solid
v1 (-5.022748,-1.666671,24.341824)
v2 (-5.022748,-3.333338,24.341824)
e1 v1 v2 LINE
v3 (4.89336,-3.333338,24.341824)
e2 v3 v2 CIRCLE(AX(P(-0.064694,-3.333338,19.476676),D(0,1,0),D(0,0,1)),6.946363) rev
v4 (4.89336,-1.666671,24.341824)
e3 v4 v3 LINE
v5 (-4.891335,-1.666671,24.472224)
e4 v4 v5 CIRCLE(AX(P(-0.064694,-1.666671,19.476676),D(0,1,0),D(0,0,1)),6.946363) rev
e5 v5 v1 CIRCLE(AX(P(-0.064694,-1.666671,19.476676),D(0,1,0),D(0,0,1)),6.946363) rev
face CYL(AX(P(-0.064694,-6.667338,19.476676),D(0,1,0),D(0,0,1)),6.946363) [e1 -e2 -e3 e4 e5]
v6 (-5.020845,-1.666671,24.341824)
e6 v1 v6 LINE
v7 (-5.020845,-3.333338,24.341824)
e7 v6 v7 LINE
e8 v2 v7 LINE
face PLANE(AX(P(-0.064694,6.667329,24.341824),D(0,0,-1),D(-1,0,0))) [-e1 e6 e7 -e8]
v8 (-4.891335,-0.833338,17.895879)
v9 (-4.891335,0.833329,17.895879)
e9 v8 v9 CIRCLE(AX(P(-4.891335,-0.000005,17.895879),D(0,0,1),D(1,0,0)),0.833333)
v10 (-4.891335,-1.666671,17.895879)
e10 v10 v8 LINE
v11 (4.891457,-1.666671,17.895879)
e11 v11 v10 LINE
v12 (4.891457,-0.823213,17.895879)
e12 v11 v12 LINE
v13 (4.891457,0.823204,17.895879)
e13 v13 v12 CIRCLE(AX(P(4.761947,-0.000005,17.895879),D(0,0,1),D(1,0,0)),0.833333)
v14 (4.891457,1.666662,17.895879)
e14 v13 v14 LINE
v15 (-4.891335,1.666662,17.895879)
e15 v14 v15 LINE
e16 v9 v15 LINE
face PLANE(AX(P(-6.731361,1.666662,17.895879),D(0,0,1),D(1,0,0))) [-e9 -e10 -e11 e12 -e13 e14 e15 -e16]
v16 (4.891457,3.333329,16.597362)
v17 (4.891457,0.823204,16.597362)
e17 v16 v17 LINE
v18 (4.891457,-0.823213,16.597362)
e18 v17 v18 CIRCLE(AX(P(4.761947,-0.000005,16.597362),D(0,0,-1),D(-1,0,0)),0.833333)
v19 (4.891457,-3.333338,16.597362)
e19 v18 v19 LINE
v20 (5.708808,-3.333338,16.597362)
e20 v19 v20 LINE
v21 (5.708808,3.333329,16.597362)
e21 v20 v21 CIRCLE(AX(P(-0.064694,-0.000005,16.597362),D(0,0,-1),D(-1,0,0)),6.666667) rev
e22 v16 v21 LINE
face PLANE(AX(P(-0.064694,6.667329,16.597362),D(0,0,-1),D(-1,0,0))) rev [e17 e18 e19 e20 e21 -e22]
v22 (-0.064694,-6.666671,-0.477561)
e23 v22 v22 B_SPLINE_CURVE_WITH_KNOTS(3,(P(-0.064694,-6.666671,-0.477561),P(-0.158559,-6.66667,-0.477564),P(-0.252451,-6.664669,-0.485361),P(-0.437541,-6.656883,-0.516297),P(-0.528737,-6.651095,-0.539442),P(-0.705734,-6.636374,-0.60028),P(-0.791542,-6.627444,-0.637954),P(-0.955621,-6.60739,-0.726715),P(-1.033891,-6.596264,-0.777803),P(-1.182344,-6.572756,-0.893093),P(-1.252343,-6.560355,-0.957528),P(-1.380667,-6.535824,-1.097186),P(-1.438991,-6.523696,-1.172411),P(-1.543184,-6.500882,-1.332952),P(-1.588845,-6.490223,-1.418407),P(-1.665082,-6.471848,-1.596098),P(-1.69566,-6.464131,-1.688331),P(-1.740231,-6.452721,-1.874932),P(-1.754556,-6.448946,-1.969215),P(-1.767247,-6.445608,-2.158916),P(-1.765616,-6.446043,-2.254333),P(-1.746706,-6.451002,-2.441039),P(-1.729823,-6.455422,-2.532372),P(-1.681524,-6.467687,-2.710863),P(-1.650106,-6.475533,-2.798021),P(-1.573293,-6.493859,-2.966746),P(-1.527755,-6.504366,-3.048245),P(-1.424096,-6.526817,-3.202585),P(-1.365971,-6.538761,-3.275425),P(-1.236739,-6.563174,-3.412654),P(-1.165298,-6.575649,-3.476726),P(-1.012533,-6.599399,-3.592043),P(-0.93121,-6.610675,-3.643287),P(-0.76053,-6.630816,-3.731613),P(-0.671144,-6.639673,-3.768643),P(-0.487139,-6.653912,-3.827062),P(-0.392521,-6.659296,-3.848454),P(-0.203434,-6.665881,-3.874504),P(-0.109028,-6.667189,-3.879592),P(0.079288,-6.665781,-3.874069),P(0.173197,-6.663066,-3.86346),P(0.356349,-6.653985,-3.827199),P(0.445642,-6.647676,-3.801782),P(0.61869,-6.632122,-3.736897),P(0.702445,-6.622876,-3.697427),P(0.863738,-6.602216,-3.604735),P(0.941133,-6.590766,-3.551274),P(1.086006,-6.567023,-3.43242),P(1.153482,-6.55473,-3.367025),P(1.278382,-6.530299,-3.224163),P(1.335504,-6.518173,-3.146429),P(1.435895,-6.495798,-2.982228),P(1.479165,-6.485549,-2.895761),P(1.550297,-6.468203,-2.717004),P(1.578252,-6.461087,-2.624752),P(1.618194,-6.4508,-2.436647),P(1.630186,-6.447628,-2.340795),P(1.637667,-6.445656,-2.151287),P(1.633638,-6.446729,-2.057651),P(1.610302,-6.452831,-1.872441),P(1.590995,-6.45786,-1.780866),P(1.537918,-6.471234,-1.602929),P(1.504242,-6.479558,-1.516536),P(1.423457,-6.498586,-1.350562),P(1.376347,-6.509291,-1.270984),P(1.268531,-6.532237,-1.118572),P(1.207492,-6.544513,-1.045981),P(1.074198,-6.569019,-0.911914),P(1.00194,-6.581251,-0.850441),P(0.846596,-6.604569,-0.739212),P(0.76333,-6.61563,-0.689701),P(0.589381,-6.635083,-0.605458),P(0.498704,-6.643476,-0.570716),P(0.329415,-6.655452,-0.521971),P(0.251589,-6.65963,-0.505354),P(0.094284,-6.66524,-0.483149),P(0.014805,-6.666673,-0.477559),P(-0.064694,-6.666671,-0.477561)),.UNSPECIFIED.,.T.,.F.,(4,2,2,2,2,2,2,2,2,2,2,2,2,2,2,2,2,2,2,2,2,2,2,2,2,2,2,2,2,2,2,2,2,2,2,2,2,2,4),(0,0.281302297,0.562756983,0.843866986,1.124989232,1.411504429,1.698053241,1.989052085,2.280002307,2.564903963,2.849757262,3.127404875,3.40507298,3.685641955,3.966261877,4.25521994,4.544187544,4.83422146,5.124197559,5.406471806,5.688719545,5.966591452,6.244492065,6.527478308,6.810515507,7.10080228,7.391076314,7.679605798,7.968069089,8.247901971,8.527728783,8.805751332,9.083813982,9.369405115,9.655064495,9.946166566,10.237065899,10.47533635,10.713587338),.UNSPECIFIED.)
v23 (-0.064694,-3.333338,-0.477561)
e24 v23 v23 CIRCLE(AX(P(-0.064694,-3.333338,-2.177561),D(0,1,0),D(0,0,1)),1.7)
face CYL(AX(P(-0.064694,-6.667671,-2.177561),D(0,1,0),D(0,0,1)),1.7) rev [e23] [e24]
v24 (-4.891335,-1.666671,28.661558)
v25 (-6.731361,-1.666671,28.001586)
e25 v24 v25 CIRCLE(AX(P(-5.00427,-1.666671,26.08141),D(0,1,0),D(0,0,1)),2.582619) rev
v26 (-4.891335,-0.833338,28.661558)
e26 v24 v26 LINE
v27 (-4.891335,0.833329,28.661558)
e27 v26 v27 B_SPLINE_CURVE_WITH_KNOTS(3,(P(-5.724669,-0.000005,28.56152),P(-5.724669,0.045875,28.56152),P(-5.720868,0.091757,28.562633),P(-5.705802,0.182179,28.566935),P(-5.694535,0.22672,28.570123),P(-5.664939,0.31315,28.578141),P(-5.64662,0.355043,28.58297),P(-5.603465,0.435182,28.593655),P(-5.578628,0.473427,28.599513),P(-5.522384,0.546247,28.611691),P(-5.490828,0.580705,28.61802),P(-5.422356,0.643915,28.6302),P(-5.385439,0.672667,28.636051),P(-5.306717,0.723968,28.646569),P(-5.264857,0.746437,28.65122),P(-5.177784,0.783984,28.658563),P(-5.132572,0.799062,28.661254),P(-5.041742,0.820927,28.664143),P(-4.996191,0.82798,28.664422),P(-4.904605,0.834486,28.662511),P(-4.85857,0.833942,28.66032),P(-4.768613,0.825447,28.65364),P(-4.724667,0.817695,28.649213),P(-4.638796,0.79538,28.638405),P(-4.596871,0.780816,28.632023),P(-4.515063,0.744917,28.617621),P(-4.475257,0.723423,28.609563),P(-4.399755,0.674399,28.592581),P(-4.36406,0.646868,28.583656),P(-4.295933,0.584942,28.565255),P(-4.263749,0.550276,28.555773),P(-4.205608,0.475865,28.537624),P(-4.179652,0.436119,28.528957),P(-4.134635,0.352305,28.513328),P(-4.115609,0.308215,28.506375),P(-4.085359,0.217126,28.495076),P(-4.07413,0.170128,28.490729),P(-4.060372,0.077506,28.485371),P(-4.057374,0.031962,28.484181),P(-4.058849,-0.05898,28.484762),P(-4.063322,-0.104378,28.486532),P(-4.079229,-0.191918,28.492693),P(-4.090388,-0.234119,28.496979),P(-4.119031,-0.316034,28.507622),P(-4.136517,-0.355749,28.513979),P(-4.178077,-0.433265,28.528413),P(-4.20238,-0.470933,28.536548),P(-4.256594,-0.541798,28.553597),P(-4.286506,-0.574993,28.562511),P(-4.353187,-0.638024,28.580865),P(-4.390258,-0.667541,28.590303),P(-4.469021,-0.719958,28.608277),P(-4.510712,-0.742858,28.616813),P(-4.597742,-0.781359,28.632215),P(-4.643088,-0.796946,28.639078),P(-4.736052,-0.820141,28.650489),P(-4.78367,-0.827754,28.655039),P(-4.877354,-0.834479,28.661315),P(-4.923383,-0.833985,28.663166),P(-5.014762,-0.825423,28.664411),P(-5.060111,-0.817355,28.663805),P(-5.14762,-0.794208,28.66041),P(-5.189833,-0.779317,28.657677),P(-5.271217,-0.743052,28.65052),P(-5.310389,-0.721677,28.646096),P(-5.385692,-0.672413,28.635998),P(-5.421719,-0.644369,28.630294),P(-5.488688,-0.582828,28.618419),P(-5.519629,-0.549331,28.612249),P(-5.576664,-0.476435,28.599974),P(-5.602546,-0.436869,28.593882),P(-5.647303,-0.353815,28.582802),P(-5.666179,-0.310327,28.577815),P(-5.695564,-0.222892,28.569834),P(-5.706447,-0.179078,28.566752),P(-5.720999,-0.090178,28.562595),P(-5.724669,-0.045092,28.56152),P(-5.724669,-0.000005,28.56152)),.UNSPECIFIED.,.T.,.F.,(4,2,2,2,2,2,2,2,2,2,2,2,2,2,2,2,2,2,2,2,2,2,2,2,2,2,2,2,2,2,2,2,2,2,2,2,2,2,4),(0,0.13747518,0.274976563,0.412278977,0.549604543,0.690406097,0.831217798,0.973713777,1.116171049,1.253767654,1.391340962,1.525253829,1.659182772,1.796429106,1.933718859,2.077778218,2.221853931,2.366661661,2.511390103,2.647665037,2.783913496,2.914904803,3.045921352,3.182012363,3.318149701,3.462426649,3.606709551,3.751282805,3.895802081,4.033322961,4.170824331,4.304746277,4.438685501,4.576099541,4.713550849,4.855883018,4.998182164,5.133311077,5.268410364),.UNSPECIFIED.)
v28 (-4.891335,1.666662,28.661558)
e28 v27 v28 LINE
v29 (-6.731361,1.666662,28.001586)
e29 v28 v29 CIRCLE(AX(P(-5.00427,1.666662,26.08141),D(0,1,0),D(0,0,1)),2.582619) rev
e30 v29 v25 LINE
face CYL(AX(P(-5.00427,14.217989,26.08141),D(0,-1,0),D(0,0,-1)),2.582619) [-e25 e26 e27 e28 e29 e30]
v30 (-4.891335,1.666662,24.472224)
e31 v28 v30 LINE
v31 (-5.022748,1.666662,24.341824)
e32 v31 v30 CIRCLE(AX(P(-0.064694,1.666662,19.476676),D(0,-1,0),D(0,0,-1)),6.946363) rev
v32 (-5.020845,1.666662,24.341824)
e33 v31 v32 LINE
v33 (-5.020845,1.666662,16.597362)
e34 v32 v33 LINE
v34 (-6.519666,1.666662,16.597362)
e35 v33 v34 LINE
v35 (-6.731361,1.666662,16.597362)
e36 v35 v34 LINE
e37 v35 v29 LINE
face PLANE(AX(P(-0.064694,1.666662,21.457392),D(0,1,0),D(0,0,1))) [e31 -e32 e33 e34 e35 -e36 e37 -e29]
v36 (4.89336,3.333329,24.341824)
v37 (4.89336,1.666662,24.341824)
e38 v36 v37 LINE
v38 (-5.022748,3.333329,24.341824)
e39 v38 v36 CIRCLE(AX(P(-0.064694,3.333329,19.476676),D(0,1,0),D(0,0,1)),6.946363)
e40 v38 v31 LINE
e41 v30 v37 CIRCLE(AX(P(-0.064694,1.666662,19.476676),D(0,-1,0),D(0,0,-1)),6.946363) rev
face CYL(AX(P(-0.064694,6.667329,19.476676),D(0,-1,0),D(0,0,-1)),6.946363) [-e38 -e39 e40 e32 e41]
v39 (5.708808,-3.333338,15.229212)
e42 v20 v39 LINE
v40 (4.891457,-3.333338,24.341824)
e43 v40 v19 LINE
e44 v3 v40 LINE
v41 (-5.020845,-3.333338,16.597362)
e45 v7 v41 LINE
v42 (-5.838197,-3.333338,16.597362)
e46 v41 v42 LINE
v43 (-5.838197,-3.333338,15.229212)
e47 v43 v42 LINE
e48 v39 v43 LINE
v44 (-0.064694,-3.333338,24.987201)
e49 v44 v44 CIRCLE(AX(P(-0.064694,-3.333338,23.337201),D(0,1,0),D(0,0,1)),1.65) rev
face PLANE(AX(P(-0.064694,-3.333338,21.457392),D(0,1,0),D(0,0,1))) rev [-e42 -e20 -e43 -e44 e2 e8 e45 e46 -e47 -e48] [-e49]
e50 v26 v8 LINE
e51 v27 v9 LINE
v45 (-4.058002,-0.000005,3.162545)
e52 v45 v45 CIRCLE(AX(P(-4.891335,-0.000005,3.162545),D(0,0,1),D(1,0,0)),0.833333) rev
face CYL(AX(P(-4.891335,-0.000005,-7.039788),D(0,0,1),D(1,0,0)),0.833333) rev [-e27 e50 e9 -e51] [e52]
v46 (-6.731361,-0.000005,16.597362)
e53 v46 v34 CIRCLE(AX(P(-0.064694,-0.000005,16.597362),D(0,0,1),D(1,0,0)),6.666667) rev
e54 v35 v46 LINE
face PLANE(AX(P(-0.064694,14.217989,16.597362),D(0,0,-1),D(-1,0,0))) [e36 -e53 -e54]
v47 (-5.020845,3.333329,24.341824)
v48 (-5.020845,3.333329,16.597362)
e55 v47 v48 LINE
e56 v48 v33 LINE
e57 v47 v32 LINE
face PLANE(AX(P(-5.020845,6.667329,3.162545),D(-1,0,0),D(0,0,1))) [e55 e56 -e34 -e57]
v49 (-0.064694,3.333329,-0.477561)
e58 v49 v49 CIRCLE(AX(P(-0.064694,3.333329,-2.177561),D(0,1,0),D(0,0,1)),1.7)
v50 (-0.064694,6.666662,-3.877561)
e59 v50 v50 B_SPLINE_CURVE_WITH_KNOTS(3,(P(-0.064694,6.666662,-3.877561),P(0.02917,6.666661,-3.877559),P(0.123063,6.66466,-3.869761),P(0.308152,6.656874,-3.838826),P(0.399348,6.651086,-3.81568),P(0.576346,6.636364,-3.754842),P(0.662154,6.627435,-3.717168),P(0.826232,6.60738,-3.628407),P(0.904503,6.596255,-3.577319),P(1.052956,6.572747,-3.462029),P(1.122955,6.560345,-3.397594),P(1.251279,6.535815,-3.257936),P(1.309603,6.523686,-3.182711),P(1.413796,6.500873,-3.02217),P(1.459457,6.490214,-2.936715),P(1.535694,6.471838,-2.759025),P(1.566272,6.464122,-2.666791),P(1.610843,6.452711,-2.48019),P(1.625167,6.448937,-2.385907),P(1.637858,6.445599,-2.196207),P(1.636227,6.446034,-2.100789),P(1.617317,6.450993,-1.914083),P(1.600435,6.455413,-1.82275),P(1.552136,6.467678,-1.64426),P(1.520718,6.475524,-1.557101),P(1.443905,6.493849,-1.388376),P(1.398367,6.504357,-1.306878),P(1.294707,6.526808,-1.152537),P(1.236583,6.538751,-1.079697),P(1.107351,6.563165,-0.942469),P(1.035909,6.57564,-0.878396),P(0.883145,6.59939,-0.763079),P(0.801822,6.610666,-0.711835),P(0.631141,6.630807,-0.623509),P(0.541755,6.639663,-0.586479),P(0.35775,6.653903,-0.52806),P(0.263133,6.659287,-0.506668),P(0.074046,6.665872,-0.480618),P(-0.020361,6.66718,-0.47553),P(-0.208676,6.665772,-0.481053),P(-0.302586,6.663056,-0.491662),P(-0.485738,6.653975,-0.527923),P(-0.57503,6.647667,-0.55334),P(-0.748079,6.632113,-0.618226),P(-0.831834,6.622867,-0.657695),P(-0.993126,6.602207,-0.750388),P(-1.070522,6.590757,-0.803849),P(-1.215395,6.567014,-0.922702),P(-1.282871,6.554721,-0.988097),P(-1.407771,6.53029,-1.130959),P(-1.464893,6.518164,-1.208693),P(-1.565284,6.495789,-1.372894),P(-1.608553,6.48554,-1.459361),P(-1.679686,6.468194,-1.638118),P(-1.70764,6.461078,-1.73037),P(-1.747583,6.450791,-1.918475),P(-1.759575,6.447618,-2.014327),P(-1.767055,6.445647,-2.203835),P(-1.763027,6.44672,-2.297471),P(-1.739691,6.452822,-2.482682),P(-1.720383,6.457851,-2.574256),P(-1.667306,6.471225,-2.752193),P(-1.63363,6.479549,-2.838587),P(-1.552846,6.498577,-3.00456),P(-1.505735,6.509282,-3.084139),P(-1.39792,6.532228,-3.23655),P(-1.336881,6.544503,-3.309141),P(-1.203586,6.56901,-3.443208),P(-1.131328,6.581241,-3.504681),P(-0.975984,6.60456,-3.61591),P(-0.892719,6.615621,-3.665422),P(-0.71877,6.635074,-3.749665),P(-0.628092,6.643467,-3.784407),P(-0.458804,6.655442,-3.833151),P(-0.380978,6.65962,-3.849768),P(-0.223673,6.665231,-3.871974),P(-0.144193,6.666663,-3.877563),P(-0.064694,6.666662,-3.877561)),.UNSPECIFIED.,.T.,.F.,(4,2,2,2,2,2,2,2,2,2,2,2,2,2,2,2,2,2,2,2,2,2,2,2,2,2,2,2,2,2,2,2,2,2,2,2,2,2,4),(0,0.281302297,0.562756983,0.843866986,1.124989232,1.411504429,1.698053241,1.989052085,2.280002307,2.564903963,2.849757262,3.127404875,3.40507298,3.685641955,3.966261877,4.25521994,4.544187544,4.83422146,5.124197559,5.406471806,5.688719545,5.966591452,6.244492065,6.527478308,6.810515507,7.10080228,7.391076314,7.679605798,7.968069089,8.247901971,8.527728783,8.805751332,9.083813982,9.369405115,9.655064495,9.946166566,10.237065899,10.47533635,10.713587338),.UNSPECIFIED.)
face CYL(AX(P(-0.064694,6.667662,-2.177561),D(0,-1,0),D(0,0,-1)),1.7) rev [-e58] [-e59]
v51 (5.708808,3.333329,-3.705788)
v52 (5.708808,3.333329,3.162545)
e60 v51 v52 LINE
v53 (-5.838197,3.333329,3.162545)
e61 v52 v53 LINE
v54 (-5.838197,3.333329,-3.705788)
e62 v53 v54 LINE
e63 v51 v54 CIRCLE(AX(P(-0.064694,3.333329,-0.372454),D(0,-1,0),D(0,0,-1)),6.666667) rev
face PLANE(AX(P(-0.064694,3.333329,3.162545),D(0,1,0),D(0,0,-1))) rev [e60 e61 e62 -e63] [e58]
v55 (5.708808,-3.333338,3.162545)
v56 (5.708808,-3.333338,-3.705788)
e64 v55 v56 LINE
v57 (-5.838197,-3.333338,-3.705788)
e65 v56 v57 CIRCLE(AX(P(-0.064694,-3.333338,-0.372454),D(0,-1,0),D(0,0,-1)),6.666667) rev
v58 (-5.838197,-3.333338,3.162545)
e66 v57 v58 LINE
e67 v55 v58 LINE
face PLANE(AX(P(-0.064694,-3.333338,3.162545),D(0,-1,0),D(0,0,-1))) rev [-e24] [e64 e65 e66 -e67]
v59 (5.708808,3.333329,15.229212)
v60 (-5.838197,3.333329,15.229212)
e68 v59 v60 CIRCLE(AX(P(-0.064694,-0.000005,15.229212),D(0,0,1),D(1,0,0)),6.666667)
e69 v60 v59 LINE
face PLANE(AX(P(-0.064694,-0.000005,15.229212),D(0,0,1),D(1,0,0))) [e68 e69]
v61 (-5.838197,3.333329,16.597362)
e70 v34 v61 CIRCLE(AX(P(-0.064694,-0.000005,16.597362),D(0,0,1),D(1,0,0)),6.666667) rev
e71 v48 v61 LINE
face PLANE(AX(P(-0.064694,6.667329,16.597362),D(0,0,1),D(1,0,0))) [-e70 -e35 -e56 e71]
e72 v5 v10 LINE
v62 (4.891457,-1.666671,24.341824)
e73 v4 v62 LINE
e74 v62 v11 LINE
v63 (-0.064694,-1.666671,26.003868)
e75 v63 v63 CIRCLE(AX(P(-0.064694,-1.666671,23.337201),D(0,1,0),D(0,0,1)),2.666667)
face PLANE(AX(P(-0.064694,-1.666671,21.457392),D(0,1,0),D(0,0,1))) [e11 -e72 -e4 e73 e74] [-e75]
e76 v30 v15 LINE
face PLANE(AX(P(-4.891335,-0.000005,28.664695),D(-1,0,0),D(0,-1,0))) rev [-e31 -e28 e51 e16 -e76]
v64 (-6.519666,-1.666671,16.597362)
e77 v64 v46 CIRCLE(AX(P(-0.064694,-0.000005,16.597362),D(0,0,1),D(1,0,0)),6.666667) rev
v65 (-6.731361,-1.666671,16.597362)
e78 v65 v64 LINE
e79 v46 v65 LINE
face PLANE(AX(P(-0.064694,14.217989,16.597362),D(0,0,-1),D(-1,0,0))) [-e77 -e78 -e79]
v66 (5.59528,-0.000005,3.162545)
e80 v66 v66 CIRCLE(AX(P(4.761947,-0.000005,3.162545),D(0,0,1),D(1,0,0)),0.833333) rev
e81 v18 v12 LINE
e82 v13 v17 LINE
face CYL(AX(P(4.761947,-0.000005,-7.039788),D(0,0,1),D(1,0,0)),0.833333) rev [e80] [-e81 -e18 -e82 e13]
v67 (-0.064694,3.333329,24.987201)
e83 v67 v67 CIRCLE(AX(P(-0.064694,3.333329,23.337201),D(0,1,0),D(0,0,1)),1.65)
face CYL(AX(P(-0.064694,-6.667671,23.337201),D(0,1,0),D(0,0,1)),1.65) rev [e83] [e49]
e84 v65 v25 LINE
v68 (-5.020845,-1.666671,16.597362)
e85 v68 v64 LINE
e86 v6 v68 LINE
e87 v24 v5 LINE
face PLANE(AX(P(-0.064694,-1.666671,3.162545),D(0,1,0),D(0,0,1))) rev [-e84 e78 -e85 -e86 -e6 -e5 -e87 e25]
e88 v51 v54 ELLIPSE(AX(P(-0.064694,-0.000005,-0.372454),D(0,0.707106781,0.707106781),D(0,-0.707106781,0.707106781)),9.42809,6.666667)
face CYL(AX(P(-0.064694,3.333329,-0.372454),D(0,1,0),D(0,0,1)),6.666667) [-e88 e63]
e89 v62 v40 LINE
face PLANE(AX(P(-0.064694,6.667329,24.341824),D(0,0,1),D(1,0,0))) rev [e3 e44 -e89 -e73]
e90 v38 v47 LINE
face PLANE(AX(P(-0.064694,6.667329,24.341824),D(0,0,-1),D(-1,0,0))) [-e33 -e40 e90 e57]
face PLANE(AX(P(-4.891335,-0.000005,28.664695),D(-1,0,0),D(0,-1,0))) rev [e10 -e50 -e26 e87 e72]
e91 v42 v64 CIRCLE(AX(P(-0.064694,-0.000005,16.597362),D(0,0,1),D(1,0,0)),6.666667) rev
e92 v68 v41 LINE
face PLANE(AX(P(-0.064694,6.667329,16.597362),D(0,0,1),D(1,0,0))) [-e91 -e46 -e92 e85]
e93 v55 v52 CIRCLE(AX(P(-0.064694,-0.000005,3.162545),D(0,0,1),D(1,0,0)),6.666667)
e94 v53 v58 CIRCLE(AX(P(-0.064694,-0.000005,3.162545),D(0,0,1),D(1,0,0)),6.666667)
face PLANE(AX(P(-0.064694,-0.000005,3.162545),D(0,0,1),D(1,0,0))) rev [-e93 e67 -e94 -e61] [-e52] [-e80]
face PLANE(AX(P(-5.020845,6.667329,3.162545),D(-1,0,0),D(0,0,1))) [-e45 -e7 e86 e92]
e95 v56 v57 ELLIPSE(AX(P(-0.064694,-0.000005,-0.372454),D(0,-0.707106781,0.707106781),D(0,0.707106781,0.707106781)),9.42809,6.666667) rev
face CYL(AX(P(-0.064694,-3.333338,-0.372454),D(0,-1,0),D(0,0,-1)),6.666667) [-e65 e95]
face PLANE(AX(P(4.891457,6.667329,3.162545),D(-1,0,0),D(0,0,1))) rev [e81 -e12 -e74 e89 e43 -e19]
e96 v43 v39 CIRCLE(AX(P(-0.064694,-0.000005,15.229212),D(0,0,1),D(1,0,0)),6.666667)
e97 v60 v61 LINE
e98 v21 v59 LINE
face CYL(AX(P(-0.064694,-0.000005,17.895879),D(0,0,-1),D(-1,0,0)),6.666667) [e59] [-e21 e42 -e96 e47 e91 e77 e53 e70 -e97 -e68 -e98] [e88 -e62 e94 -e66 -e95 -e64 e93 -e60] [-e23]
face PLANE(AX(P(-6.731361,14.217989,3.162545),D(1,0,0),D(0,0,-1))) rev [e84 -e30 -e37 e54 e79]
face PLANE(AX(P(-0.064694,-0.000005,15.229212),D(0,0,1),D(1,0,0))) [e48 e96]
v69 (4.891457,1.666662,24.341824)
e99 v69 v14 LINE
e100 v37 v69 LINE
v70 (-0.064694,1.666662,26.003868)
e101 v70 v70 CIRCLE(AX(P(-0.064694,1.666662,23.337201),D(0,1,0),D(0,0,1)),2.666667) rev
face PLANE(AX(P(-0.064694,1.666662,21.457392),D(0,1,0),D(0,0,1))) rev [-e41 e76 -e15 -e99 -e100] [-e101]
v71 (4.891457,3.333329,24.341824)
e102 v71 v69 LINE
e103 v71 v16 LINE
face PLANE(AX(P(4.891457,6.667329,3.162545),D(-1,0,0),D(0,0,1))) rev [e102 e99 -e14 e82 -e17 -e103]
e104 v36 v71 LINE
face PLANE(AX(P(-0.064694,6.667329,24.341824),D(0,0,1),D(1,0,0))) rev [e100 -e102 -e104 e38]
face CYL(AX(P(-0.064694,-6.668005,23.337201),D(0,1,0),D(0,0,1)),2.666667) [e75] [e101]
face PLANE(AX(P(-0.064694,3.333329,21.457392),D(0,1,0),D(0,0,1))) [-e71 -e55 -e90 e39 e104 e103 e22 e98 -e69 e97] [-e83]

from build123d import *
from build123d.topology import SkipClean

# Parameters (mm, degrees)
SKETCH2_R                       = 10
PHALANGE_LENGTH_DEPTH           = 22.1
BOSS_EXTRUDE3_DEPTH             = 5
BOSS_EXTRUDE4_DEPTH             = 5
BOSS_EXTRUDE4_DEPTH_BACK        = 5
CUT_EXTRUDE2_START              = -15.3025
CUT_EXTRUDE2_DEPTH              = 15.3025
SKETCH7_R                       = 1.65
CUT_EXTRUDE3_DEPTH              = 10
CUT_EXTRUDE4_DEPTH              = 2.5
CUT_EXTRUDE4_DEPTH_BACK         = 2.5
CUT_EXTRUDE7_REACH              = 43.565
SKETCH4_R                       = 1.65
CUT_EXTRUDE7_DIRECTION_2_REACH  = 43.565
CUT_EXTRUDE_THIN1_START         = 22.1
CUT_EXTRUDE_THIN1_DEPTH         = 10.361670454
BOSS_EXTRUDE5_REACH             = 42.73
SKETCH9_R                       = 4
SKETCH9_R_2                     = 1.65
CUT_EXTRUDE8_REACH              = 41.987
SKETCH10_R                      = 1.25
CUT_EXTRUDE9_START              = -4
CUT_EXTRUDE9_DEPTH              = 4
CUT_EXTRUDE10_REACH             = 42.73
CUT_EXTRUDE10_DIRECTION_2_REACH = 42.73
CUT_EXTRUDE11_START             = -10
CUT_EXTRUDE11_OUTLINE_W         = 2.565773848
CUT_EXTRUDE11_OUTLINE_H         = 11.6166929
CUT_EXTRUDE11_DEPTH             = 10
BOSS_EXTRUDE7_REACH             = 40.388
CUT_EXTRUDE12_REACH             = 41.987
SKETCH10_2_R                    = 1.25
CUT_EXTRUDE12_DIRECTION_2_REACH = 41.987
SKETCH17_R                      = 1.25
SKETCH17_W                      = 2.42123439
SKETCH17_H                      = 5
CUT_EXTRUDE14_DEPTH             = 16.148519
SCALE1_SCALE                    = 0.666666667
CUT_EXTRUDE15_START             = -10
SKETCH18_R                      = 1.65
CUT_EXTRUDE15_DEPTH             = 13.333338
CUT_EXTRUDE16_START             = -3.333333
SKETCH19_R                      = 1.7
CUT_EXTRUDE16_DEPTH             = 13.333338


# Read off the part's stored shape, not the designer's step: Cut-Extrude-Thin1, Cut-Extrude11
with BuildPart() as part:
    # Sketch2 → Phalange Length (new body)
    with BuildSketch(Plane.XY):
        Circle(SKETCH2_R)
    extrude(amount=PHALANGE_LENGTH_DEPTH)

    # Sketch3 → Boss-Extrude3 (add)
    with BuildSketch(Plane(origin=(0, -10, 0), x_dir=(-1, 0, 0), z_dir=(0, -1, 0))):
        with BuildLine():
            Line((-10, 5.302499701), (-10, 0))
            Line((-10, 0), (10, 0))
            Line((10, 0), (10, 5.302499701))
            ThreePointArc((10, 5.302499701), (0, 15.302499701), (-10, 5.302499701))
        make_face()
    boss_extrude3 = extrude(amount=-BOSS_EXTRUDE3_DEPTH)

    # Mirror1: Boss-Extrude3 across plane
    add(boss_extrude3.mirror(Plane.ZX))

    # Sketch5 → Boss-Extrude4 (add, two sides: drawn at the far end of the back side and taken through both)
    with BuildSketch(Plane(origin=(0, 0, 0), x_dir=(1, 0, 0), z_dir=(0, 1, 0)).offset(-BOSS_EXTRUDE4_DEPTH_BACK)):
        with BuildLine():
            Line((-10, -27.883157911), (-10, -22.1))
            Line((-10, -22.1), (10, -22.1))
            Line((10, -22.1), (10, -27.883157911))
            ThreePointArc((10, -27.883157911), (0, -37.451984156), (-10, -27.883157911))
        make_face()
    extrude(amount=BOSS_EXTRUDE4_DEPTH + BOSS_EXTRUDE4_DEPTH_BACK)

    # Sketch6 → Cut-Extrude2 (cut)
    with SkipClean():  # the faces are left unmerged after this step: merging them gives an invalid solid
        with BuildSketch(Plane.XY.offset(CUT_EXTRUDE2_START)):
            with BuildLine():
                ThreePointArc((0, 10), (5, 8.660254038), (8.660254038, 5))
                Line((8.660254038, 5), (10, 5))
                Line((10, 5), (10, 10))
                Line((10, 10), (0, 10))
            make_face()
            with BuildLine():
                Line((10, -5), (8.660254038, -5))
                ThreePointArc((8.660254038, -5), (5, -8.660254038), (0, -10))
                Line((0, -10), (10, -10))
                Line((10, -10), (10, -5))
            make_face()
            with BuildLine():
                ThreePointArc((-8.660254038, 5), (-5, 8.660254038), (0, 10))
                Line((0, 10), (-10, 10))
                Line((-10, 10), (-10, 5))
                Line((-10, 5), (-8.660254038, 5))
            make_face()
            with BuildLine():
                Line((-10, -10), (0, -10))
                ThreePointArc((0, -10), (-5, -8.660254038), (-8.660254038, -5))
                Line((-8.660254038, -5), (-10, -5))
                Line((-10, -5), (-10, -10))
            make_face()
        extrude(amount=CUT_EXTRUDE2_DEPTH, mode=Mode.SUBTRACT)

    # Sketch7 → Cut-Extrude3 (cut)
    with SkipClean():  # the faces are left unmerged after this step: merging them gives an invalid solid
        with BuildSketch(Plane(origin=(0, 5, 0), x_dir=(1, 0, 0), z_dir=(0, 1, 0))):
            with Locations(Location((0, -30.261984156, 0), (0, 0, 270))):
                Circle(SKETCH7_R)
        extrude(amount=-CUT_EXTRUDE3_DEPTH, mode=Mode.SUBTRACT)

    # Sketch5<2> → Cut-Extrude4 (cut, two sides: drawn at the far end of the back side and taken through both)
    with BuildSketch(Plane(origin=(0, 0, 0), x_dir=(1, 0, 0), z_dir=(0, 1, 0)).offset(-CUT_EXTRUDE4_DEPTH_BACK)):
        with BuildLine():
            Line((-10, -27.883157911), (-10, -22.1))
            Line((-10, -22.1), (10, -22.1))
            Line((10, -22.1), (10, -27.883157911))
            ThreePointArc((10, -27.883157911), (0, -37.451984156), (-10, -27.883157911))
        make_face()
    extrude(amount=CUT_EXTRUDE4_DEPTH + CUT_EXTRUDE4_DEPTH_BACK, mode=Mode.SUBTRACT)

    # Sketch4 → Cut-Extrude7 (cut, up to next)
    with BuildSketch(Plane(origin=(0, -5, 0), x_dir=(1, 0, 0), z_dir=(0, 1, 0)), mode=Mode.PRIVATE) as cut_extrude7_sk1:
        with Locations(Location((0, 8.010159673, 0), (0, 0, 270))):
            Circle(SKETCH4_R)
    cut_extrude7_tool1 = extrude(cut_extrude7_sk1.sketch, amount=-CUT_EXTRUDE7_REACH, mode=Mode.PRIVATE) & part.part
    add(cut_extrude7_tool1.solids().sort_by_distance((0, -5, -8.01016))[0], mode=Mode.SUBTRACT)

    # Sketch4 → Cut-Extrude7 direction 2 (cut, up to next)
    with BuildSketch(Plane(origin=(0, -5, 0), x_dir=(1, 0, 0), z_dir=(0, 1, 0)), mode=Mode.PRIVATE) as cut_extrude7_direction_2_sk1:
        with Locations(Location((0, 8.010159673, 0), (0, 0, 270))):
            Circle(SKETCH4_R)
    cut_extrude7_direction_2_tool1 = extrude(cut_extrude7_direction_2_sk1.sketch, amount=CUT_EXTRUDE7_DIRECTION_2_REACH, mode=Mode.PRIVATE) & part.part
    add(cut_extrude7_direction_2_tool1.solids().sort_by_distance((0, -5, -8.01016))[0], mode=Mode.SUBTRACT)

    # Cut-Extrude-Thin1 outline → Cut-Extrude-Thin1 (cut)
    with SkipClean():  # the faces are left unmerged after this step: merging them gives an invalid solid
        with BuildSketch(Plane.XY.offset(CUT_EXTRUDE_THIN1_START)):
            with BuildLine():
                ThreePointArc((8.660254038, 5), (9.256147934, 3.78466979), (9.682458366, 2.5))
                Line((9.682458366, 2.5), (10, 2.5))
                Line((10, 2.5), (10, 5))
                Line((10, 5), (8.660254038, 5))
            make_face()
            with BuildLine():
                Line((10, -2.5), (9.682458366, -2.5))
                ThreePointArc((9.682458366, -2.5), (9.256147934, -3.78466979), (8.660254038, -5))
                Line((8.660254038, -5), (10, -5))
                Line((10, -5), (10, -2.5))
            make_face()
            with BuildLine():
                Line((-10, 2.5), (-9.682458366, 2.5))
                ThreePointArc((-9.682458366, 2.5), (-9.256147934, 3.78466979), (-8.660254038, 5))
                Line((-8.660254038, 5), (-10, 5))
                Line((-10, 5), (-10, 2.5))
            make_face()
            with BuildLine():
                ThreePointArc((-8.660254038, -5), (-9.256147934, -3.78466979), (-9.682458366, -2.5))
                Line((-9.682458366, -2.5), (-10, -2.5))
                Line((-10, -2.5), (-10, -5))
                Line((-10, -5), (-8.660254038, -5))
            make_face()
        extrude(amount=CUT_EXTRUDE_THIN1_DEPTH, mode=Mode.SUBTRACT)

    # Sketch9 → Boss-Extrude5 (add, up to next)
    with BuildSketch(Plane.XZ.offset(-2.5), mode=Mode.PRIVATE) as boss_extrude5_sk1:
        with Locations(Location((0, 30.261984156, 0), (0, 0, 90))):
            Circle(SKETCH9_R)
        with Locations(Location((0, 30.261984156, 0), (0, 0, 90))):
            Circle(SKETCH9_R_2, mode=Mode.SUBTRACT)
    boss_extrude5_tool1 = extrude(boss_extrude5_sk1.sketch, amount=BOSS_EXTRUDE5_REACH, mode=Mode.PRIVATE) - part.part
    add(boss_extrude5_tool1.solids().sort_by_distance((0, 2.5, 26.375121))[0])

    # Sketch10 → Cut-Extrude8 (cut, up to next)
    with BuildSketch(Plane.XY.offset(22.1), mode=Mode.PRIVATE) as cut_extrude8_sk1:
        with Locations((7.239961745, 0)):
            Circle(SKETCH10_R)
    cut_extrude8_tool1 = extrude(cut_extrude8_sk1.sketch, amount=-CUT_EXTRUDE8_REACH, mode=Mode.PRIVATE) & part.part
    # Sketch10 → Cut-Extrude8 (cut, up to next)
    with BuildSketch(Plane.XY.offset(22.1), mode=Mode.PRIVATE) as cut_extrude8_sk2:
        with Locations((-7.239961745, 0)):
            Circle(SKETCH10_R)
    cut_extrude8_tool2 = extrude(cut_extrude8_sk2.sketch, amount=-CUT_EXTRUDE8_REACH, mode=Mode.PRIVATE) & part.part
    add(cut_extrude8_tool1.solids().sort_by_distance((7.239962, 0, 22.1))[0], mode=Mode.SUBTRACT)
    add(cut_extrude8_tool2.solids().sort_by_distance((-7.239962, 0, 22.1))[0], mode=Mode.SUBTRACT)

    # Sketch11 → Cut-Extrude9 (cut)
    with SkipClean():  # the faces are left unmerged after this step: merging them gives an invalid solid
        with BuildSketch(Plane.XY.offset(22.1).offset(CUT_EXTRUDE9_START)):
            with BuildLine():
                ThreePointArc((8.660254038, 5), (0, 10), (-8.660254038, 5))
                Line((-8.660254038, 5), (8.660254038, 5))
            make_face()
            with BuildLine():
                Line((8.660254038, -5), (-8.660254038, -5))
                ThreePointArc((-8.660254038, -5), (0, -10), (8.660254038, -5))
            make_face()
        extrude(amount=CUT_EXTRUDE9_DEPTH, mode=Mode.SUBTRACT)

    # Sketch12 → Cut-Extrude10 (cut, up to next)
    with BuildSketch(Plane.XZ.offset(-2.5), mode=Mode.PRIVATE) as cut_extrude10_sk1:
        with BuildLine():
            Line((-10.033719202, 37.451984156), (-10.033719202, 30.264892021))
            Line((-10.033719202, 30.264892021), (-8.660254038, 30.264892021))
            ThreePointArc((-8.660254038, 30.264892021), (0, 34.890740593), (8.660254038, 30.264892021))
            Line((8.660254038, 30.264892021), (10.033719202, 30.264892021))
            Line((10.033719202, 30.264892021), (10.033719202, 37.451984156))
            Line((10.033719202, 37.451984156), (-10.033719202, 37.451984156))
        make_face()
    cut_extrude10_tool1 = extrude(cut_extrude10_sk1.sketch, amount=CUT_EXTRUDE10_REACH, mode=Mode.PRIVATE) & part.part
    add(cut_extrude10_tool1.solids().sort_by_distance((0, 2.5, 34.950279))[0], mode=Mode.SUBTRACT)

    # Sketch12 → Cut-Extrude10 direction 2 (cut, up to next)
    with BuildSketch(Plane.XZ.offset(-2.5), mode=Mode.PRIVATE) as cut_extrude10_direction_2_sk1:
        with BuildLine():
            Line((-10.033719202, 37.451984156), (-10.033719202, 30.264892021))
            Line((-10.033719202, 30.264892021), (-8.660254038, 30.264892021))
            ThreePointArc((-8.660254038, 30.264892021), (0, 34.890740593), (8.660254038, 30.264892021))
            Line((8.660254038, 30.264892021), (10.033719202, 30.264892021))
            Line((10.033719202, 30.264892021), (10.033719202, 37.451984156))
            Line((10.033719202, 37.451984156), (-10.033719202, 37.451984156))
        make_face()
    cut_extrude10_direction_2_tool1 = extrude(cut_extrude10_direction_2_sk1.sketch, amount=-CUT_EXTRUDE10_DIRECTION_2_REACH, mode=Mode.PRIVATE) & part.part
    add(cut_extrude10_direction_2_tool1.solids().sort_by_distance((0, 2.5, 34.950279))[0], mode=Mode.SUBTRACT)

    # Cut-Extrude11 outline → Cut-Extrude11 (cut)
    with BuildSketch(Plane.XZ.offset(5).offset(CUT_EXTRUDE11_START)):
        with Locations((-8.717113076, 25.960571369)):
            Rectangle(CUT_EXTRUDE11_OUTLINE_W, CUT_EXTRUDE11_OUTLINE_H)
        with Locations((8.717113076, 25.960571369)):
            Rectangle(CUT_EXTRUDE11_OUTLINE_W, CUT_EXTRUDE11_OUTLINE_H)
    extrude(amount=CUT_EXTRUDE11_DEPTH, mode=Mode.SUBTRACT)

    # Boss-Extrude7: up to this face of the body (flat: up to its plane)
    boss_extrude7_end = Plane(part.part.faces().sort_by_distance((0, 2.5, 22.296174341))[0])
    # Sketch16 → Boss-Extrude7 (add, up to the picked face)
    with BuildSketch(Plane(origin=(0, -2.5, 0), x_dir=(1, 0, 0), z_dir=(0, 1, 0)), mode=Mode.PRIVATE) as boss_extrude7_sk1:
        with BuildLine():
            Line((-4.818727355, -20.152224919), (-7.434226152, -20.152224919))
            Line((-7.434226152, -20.152224919), (-10, -20.152224919))
            Line((-10, -20.152224919), (-10, -37.258561033))
            ThreePointArc((-10, -37.258561033), (-8.808295471, -37.990817912), (-7.43422564, -38.252145139))
            ThreePointArc((-7.43422564, -38.252145139), (-6.033645007, -37.999721533), (-4.818727355, -37.258561033))
            Line((-4.818727355, -37.258561033), (-4.818727355, -33.709527951))
            ThreePointArc((-4.818727355, -33.709527951), (-6.204248493, -32.842230104), (-7.437080645, -31.768917819))
            Line((-7.437080645, -31.768917819), (-7.434226152, -31.768917819))
            Line((-7.434226152, -31.768917819), (-7.434226152, -22.1))
            Line((-7.434226152, -22.1), (-4.818727355, -22.1))
            Line((-4.818727355, -22.1), (-4.818727355, -20.152224919))
        make_face()
    boss_extrude7_tool1 = split(extrude(boss_extrude7_sk1.sketch, amount=BOSS_EXTRUDE7_REACH, mode=Mode.PRIVATE), bisect_by=boss_extrude7_end, keep=Keep.BOTH, mode=Mode.PRIVATE)
    # Sketch16 → Boss-Extrude7 (add, up to the picked face)
    with BuildSketch(Plane(origin=(0, -2.5, 0), x_dir=(1, 0, 0), z_dir=(0, 1, 0)), mode=Mode.PRIVATE) as boss_extrude7_sk2:
        with BuildLine():
            Line((-4.818727355, -33.709527951), (-4.818727355, -22.1))
            Line((-4.818727355, -22.1), (-7.434226152, -22.1))
            Line((-7.434226152, -22.1), (-7.434226152, -31.768917819))
            Line((-7.434226152, -31.768917819), (-7.437080645, -31.768917819))
            ThreePointArc((-7.437080645, -31.768917819), (-6.204248493, -32.842230104), (-4.818727355, -33.709527951))
        make_face()
    boss_extrude7_tool2 = split(extrude(boss_extrude7_sk2.sketch, amount=BOSS_EXTRUDE7_REACH, mode=Mode.PRIVATE), bisect_by=boss_extrude7_end, keep=Keep.BOTH, mode=Mode.PRIVATE)
    add(boss_extrude7_tool1.solids().sort_by(Axis((-7.989429, -2.5, 29.733344), (0, 1, 0)))[0])
    add(boss_extrude7_tool2.solids().sort_by(Axis((-6.08748, -2.5, 27.4879), (0, 1, 0)))[0])

    # Sketch10<2> → Cut-Extrude12 (cut, up to next)
    with BuildSketch(Plane.XY.offset(22.1), mode=Mode.PRIVATE) as cut_extrude12_sk1:
        with Locations((-7.239961745, 0)):
            Circle(SKETCH10_2_R)
    cut_extrude12_tool1 = extrude(cut_extrude12_sk1.sketch, amount=CUT_EXTRUDE12_REACH, mode=Mode.PRIVATE) & part.part
    add(cut_extrude12_tool1.solids().sort_by_distance((-7.239962, 0, 22.1))[0], mode=Mode.SUBTRACT)

    # Sketch10<2> → Cut-Extrude12 direction 2 (cut, up to next)
    with BuildSketch(Plane.XY.offset(22.1), mode=Mode.PRIVATE) as cut_extrude12_direction_2_sk1:
        with Locations((-7.239961745, 0)):
            Circle(SKETCH10_2_R)
    cut_extrude12_direction_2_tool1 = extrude(cut_extrude12_direction_2_sk1.sketch, amount=-CUT_EXTRUDE12_DIRECTION_2_REACH, mode=Mode.PRIVATE) & part.part
    add(cut_extrude12_direction_2_tool1.solids().sort_by_distance((-7.239962, 0, 22.1))[0], mode=Mode.SUBTRACT)

    # Sketch17 → Cut-Extrude14 (cut)
    with SkipClean():  # the faces are left unmerged after this step: merging them gives an invalid solid
        with BuildSketch(Plane.XY.offset(22.1)):
            with Locations((-7.239961745, 0)):
                Circle(SKETCH17_R)
            with Locations((-6.02934455, 0)):
                Rectangle(SKETCH17_W, SKETCH17_H)
        extrude(amount=CUT_EXTRUDE14_DEPTH, mode=Mode.SUBTRACT)


with BuildPart() as part_1:
    # Scale1: scaled about (-0.194054701, -1.77e-07, 9.487138568)
    add(part.part.scale(SCALE1_SCALE).moved(Location((-0.0646849, -5.9e-08, 3.162379523))))

    # Sketch18 → Cut-Extrude15 (cut)
    with BuildSketch(Plane(origin=(0, 3.333328714, 0), x_dir=(1, 0, 0), z_dir=(0, 1, 0)).offset(CUT_EXTRUDE15_START)):
        with Locations(Location((-0.064694214, -23.337201464, 0), (0, 0, 270))):
            Circle(SKETCH18_R)
    extrude(amount=CUT_EXTRUDE15_DEPTH, mode=Mode.SUBTRACT)

    # Sketch19 → Cut-Extrude16 (cut)
    with BuildSketch(Plane(origin=(0, -3.333337953, 0), x_dir=(1, 0, 0), z_dir=(0, 1, 0)).offset(CUT_EXTRUDE16_START)):
        with Locations(Location((-0.064694214, 2.177561088, 0), (0, 0, 90))):
            Circle(SKETCH19_R)
    extrude(amount=CUT_EXTRUDE16_DEPTH, mode=Mode.SUBTRACT)


solid = part_1.part
